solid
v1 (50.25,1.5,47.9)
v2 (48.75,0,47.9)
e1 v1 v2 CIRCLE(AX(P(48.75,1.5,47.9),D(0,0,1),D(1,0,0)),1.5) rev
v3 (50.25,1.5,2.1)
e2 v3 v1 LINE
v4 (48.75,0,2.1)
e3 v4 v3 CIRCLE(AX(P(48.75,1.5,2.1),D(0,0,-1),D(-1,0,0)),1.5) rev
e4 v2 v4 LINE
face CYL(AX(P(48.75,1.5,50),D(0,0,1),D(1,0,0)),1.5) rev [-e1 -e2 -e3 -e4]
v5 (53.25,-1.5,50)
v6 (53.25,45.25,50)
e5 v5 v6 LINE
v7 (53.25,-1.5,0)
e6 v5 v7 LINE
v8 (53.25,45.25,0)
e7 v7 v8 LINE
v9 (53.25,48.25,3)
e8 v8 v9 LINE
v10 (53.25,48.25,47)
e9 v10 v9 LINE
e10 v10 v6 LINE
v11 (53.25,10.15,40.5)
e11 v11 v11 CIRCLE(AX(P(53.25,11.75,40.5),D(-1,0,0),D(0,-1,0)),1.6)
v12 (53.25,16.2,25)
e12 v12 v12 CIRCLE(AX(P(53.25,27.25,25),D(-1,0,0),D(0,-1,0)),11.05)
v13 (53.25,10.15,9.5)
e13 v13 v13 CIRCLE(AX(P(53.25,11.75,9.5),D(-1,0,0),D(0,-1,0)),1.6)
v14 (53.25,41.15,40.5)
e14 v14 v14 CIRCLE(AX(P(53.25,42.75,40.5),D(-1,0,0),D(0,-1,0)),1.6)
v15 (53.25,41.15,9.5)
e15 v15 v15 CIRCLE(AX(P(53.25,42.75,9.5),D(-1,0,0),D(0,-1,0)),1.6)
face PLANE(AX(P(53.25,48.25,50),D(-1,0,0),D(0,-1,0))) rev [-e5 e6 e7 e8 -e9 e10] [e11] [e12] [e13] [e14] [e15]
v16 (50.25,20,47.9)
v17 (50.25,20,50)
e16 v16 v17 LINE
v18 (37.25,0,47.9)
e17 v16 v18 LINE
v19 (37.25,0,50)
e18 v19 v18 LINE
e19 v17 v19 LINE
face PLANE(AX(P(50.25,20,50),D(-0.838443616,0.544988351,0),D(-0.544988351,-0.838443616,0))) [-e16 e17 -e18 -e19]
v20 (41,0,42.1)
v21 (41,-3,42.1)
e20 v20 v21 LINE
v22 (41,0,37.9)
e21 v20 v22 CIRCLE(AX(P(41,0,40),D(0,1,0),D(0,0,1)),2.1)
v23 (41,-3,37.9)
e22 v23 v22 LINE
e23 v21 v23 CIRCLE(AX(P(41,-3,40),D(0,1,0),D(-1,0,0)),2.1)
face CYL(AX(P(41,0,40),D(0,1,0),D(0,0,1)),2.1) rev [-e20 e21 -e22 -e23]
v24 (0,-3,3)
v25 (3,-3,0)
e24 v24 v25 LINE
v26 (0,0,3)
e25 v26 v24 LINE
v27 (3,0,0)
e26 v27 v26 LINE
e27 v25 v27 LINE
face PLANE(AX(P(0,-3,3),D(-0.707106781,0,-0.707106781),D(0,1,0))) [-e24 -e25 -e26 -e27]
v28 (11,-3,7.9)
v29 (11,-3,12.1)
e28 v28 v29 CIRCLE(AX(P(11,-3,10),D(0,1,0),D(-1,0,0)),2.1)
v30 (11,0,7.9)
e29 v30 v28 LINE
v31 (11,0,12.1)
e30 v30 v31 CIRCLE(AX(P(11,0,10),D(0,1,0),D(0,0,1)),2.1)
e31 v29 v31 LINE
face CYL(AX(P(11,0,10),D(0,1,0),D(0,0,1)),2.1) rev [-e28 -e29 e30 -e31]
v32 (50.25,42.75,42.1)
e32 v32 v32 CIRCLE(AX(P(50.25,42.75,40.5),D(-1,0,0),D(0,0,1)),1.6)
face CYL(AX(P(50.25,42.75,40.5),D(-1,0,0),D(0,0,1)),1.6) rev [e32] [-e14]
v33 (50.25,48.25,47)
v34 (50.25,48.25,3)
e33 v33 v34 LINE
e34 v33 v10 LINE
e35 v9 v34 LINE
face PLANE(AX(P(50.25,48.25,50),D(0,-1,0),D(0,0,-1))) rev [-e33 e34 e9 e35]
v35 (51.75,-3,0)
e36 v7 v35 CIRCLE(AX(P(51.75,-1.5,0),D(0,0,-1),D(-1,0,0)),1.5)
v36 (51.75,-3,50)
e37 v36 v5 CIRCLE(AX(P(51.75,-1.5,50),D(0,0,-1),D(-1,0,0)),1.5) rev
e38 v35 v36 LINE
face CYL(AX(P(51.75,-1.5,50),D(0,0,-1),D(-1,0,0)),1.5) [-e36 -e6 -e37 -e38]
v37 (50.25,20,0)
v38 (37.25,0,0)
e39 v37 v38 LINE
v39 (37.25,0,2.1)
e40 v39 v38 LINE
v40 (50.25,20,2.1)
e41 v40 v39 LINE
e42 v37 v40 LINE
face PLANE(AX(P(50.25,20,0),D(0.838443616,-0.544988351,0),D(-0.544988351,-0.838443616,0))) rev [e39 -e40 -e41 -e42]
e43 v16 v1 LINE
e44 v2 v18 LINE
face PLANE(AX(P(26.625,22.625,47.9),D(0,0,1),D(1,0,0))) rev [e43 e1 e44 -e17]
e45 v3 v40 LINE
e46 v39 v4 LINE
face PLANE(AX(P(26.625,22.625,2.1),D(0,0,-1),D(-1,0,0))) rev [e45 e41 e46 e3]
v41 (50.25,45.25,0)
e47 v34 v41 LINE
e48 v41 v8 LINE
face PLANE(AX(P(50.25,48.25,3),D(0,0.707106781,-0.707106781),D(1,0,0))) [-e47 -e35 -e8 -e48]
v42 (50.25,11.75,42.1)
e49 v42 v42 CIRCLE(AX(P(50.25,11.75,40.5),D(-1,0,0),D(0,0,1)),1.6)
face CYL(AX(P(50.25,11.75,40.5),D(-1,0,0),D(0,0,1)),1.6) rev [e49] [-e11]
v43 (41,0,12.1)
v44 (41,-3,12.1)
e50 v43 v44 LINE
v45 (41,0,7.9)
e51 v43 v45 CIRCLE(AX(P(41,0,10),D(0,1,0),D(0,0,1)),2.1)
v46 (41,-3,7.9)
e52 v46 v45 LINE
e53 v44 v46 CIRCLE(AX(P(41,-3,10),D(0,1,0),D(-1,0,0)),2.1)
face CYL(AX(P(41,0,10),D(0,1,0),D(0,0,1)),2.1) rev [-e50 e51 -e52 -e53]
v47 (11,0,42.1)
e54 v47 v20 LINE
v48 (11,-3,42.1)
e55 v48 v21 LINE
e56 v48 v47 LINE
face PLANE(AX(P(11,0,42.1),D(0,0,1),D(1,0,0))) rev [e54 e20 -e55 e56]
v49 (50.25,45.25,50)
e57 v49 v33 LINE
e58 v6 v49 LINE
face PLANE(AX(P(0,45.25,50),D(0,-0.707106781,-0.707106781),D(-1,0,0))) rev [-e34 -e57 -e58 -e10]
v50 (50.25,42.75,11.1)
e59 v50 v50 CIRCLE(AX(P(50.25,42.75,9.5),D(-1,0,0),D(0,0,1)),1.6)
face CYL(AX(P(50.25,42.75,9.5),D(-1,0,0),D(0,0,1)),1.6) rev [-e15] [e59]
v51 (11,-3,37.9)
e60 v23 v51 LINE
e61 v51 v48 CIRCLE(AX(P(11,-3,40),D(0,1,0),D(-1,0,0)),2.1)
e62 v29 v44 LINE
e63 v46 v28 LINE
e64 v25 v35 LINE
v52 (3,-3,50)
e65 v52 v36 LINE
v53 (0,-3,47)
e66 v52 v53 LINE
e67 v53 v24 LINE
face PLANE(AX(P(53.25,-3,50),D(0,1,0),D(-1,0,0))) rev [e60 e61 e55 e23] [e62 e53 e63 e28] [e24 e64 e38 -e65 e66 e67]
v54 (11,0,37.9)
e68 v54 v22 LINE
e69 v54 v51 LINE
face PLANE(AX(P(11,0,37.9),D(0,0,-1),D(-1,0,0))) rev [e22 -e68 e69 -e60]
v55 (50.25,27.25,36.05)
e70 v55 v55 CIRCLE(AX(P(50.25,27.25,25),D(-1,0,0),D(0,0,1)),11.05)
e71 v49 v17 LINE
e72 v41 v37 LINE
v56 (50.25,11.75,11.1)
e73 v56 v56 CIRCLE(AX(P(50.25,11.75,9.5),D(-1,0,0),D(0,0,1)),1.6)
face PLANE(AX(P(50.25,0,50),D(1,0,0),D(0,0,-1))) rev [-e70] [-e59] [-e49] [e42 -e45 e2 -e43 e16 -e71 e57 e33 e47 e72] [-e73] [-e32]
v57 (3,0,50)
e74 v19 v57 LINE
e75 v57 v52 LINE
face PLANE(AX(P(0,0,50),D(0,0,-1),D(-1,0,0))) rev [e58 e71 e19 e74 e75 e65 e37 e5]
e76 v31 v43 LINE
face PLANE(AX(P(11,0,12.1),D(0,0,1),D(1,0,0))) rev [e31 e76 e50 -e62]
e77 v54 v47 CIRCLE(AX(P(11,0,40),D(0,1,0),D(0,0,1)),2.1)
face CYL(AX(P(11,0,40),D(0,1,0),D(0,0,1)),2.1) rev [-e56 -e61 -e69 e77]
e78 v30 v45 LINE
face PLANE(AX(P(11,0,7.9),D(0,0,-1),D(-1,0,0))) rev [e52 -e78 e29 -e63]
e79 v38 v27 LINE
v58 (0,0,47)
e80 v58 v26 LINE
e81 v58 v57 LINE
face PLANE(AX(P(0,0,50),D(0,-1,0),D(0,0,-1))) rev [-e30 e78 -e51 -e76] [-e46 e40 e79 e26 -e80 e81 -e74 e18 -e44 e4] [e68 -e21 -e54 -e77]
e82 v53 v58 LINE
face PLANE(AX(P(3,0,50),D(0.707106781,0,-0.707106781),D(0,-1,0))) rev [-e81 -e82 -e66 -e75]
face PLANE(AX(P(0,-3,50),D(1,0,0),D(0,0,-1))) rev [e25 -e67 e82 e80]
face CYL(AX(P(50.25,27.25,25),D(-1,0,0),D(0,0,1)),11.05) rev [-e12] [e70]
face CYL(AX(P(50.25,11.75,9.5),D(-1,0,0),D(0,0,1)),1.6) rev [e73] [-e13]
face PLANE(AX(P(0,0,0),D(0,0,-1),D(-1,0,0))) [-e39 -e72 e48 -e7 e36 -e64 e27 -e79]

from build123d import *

# Parameters (mm, degrees)
EXTRUDE_1_DEPTH             = 50
HOLE_WIZARD_1_D             = 22.1
HOLE_WIZARD_1_DEPTH         = 100
HOLE_WIZARD_2_D             = 3.2
HOLE_WIZARD_2_DEPTH         = 100
HOLE_START                  = -3
HOLE_WIZARD_4_2_4_2_1_DEPTH = 3
RIB_1_REACH                 = 89.542
SKETCH_13_WALL_W            = 200.93798631
SKETCH_13_WALL_H            = 2.1
CHAMFER_1_SIZE              = 3
FILLET_1_R                  = 1.5
FILLET_2_R                  = 1.5


# Read off the part's stored shape, not the designer's step: Ø4.2 (4.2) 直径槽口1
with BuildPart() as part:
    # 草图1 → 凸台-拉伸1 (new body)
    with BuildSketch(Plane.XY):
        Polygon((0, 0), (50.25, 0), (50.25, 48.25), (53.25, 48.25), (53.25, -3), (0, -3), align=None)
    extrude(amount=EXTRUDE_1_DEPTH)

    # 孔1
    with Locations(Plane.ZY.offset(-50.25)):
        with Locations((25, 27.25)):
            Hole(HOLE_WIZARD_1_D / 2, depth=HOLE_WIZARD_1_DEPTH)

    # 孔2
    with Locations(Plane.ZY.offset(-50.25)):
        with Locations((9.5, 42.75), (40.5, 42.75), (40.5, 11.75), (9.5, 11.75)):
            Hole(HOLE_WIZARD_2_D / 2, depth=HOLE_WIZARD_2_DEPTH)

    # Ø4.2 (4.2) 直径槽口1 outline → Ø4.2 (4.2) 直径槽口1 (cut)
    with BuildSketch(Plane(origin=(0, 0, 0), x_dir=(1, 0, 0), z_dir=(0, 1, 0)).offset(HOLE_START)):
        with BuildLine():
            Line((11, -42.1), (41, -42.1))
            ThreePointArc((41, -42.1), (43.1, -40), (41, -37.9))
            Line((41, -37.9), (11, -37.9))
            ThreePointArc((11, -37.9), (8.9, -40), (11, -42.1))
        make_face()
        with BuildLine():
            Line((11, -12.1), (41, -12.1))
            ThreePointArc((41, -12.1), (43.1, -10), (41, -7.9))
            Line((41, -7.9), (11, -7.9))
            ThreePointArc((11, -7.9), (8.9, -10), (11, -12.1))
        make_face()
    extrude(amount=HOLE_WIZARD_4_2_4_2_1_DEPTH, mode=Mode.SUBTRACT)

    # 草图13 wall → 筋1 (add, up to next)
    with BuildSketch(Plane(origin=(43.75, 10, 50), x_dir=(-0.544988350595, -0.838443616301, 0), z_dir=(0.838443616301, -0.544988350595, 0)), mode=Mode.PRIVATE) as rib_1_sk1:
        with Locations((0, 1.05)):
            Rectangle(SKETCH_13_WALL_W, SKETCH_13_WALL_H)
    rib_1_tool1 = extrude(rib_1_sk1.sketch, amount=RIB_1_REACH, mode=Mode.PRIVATE) - part.part
    rib_1 = rib_1_tool1.solids().sort_by_distance((43.75, 10, 50))[0]
    add(rib_1)

    # 镜向1: 筋1 across plane
    add(rib_1.mirror(Plane.XY.offset(25)))

    # 倒角1
    chamfer_1_edges = [part.edges().sort_by_distance(p)[0] for p in [
        (51.75, 48.25, 50),
        (0, -1.5, 50),
        (51.75, 48.25, 0),
        (0, -1.5, 0),
    ]]
    chamfer(chamfer_1_edges, length=CHAMFER_1_SIZE)

    # 圆角1
    fillet_1_edges = [part.edges().sort_by_distance(p)[0] for p in [
        (53.25, -3, 25),
    ]]
    fillet(fillet_1_edges, radius=FILLET_1_R)

    # 圆角2
    fillet_2_edges = [part.edges().sort_by_distance(p)[0] for p in [
        (50.25, 0, 25),
    ]]
    fillet(fillet_2_edges, radius=FILLET_2_R)


solid = part.part
